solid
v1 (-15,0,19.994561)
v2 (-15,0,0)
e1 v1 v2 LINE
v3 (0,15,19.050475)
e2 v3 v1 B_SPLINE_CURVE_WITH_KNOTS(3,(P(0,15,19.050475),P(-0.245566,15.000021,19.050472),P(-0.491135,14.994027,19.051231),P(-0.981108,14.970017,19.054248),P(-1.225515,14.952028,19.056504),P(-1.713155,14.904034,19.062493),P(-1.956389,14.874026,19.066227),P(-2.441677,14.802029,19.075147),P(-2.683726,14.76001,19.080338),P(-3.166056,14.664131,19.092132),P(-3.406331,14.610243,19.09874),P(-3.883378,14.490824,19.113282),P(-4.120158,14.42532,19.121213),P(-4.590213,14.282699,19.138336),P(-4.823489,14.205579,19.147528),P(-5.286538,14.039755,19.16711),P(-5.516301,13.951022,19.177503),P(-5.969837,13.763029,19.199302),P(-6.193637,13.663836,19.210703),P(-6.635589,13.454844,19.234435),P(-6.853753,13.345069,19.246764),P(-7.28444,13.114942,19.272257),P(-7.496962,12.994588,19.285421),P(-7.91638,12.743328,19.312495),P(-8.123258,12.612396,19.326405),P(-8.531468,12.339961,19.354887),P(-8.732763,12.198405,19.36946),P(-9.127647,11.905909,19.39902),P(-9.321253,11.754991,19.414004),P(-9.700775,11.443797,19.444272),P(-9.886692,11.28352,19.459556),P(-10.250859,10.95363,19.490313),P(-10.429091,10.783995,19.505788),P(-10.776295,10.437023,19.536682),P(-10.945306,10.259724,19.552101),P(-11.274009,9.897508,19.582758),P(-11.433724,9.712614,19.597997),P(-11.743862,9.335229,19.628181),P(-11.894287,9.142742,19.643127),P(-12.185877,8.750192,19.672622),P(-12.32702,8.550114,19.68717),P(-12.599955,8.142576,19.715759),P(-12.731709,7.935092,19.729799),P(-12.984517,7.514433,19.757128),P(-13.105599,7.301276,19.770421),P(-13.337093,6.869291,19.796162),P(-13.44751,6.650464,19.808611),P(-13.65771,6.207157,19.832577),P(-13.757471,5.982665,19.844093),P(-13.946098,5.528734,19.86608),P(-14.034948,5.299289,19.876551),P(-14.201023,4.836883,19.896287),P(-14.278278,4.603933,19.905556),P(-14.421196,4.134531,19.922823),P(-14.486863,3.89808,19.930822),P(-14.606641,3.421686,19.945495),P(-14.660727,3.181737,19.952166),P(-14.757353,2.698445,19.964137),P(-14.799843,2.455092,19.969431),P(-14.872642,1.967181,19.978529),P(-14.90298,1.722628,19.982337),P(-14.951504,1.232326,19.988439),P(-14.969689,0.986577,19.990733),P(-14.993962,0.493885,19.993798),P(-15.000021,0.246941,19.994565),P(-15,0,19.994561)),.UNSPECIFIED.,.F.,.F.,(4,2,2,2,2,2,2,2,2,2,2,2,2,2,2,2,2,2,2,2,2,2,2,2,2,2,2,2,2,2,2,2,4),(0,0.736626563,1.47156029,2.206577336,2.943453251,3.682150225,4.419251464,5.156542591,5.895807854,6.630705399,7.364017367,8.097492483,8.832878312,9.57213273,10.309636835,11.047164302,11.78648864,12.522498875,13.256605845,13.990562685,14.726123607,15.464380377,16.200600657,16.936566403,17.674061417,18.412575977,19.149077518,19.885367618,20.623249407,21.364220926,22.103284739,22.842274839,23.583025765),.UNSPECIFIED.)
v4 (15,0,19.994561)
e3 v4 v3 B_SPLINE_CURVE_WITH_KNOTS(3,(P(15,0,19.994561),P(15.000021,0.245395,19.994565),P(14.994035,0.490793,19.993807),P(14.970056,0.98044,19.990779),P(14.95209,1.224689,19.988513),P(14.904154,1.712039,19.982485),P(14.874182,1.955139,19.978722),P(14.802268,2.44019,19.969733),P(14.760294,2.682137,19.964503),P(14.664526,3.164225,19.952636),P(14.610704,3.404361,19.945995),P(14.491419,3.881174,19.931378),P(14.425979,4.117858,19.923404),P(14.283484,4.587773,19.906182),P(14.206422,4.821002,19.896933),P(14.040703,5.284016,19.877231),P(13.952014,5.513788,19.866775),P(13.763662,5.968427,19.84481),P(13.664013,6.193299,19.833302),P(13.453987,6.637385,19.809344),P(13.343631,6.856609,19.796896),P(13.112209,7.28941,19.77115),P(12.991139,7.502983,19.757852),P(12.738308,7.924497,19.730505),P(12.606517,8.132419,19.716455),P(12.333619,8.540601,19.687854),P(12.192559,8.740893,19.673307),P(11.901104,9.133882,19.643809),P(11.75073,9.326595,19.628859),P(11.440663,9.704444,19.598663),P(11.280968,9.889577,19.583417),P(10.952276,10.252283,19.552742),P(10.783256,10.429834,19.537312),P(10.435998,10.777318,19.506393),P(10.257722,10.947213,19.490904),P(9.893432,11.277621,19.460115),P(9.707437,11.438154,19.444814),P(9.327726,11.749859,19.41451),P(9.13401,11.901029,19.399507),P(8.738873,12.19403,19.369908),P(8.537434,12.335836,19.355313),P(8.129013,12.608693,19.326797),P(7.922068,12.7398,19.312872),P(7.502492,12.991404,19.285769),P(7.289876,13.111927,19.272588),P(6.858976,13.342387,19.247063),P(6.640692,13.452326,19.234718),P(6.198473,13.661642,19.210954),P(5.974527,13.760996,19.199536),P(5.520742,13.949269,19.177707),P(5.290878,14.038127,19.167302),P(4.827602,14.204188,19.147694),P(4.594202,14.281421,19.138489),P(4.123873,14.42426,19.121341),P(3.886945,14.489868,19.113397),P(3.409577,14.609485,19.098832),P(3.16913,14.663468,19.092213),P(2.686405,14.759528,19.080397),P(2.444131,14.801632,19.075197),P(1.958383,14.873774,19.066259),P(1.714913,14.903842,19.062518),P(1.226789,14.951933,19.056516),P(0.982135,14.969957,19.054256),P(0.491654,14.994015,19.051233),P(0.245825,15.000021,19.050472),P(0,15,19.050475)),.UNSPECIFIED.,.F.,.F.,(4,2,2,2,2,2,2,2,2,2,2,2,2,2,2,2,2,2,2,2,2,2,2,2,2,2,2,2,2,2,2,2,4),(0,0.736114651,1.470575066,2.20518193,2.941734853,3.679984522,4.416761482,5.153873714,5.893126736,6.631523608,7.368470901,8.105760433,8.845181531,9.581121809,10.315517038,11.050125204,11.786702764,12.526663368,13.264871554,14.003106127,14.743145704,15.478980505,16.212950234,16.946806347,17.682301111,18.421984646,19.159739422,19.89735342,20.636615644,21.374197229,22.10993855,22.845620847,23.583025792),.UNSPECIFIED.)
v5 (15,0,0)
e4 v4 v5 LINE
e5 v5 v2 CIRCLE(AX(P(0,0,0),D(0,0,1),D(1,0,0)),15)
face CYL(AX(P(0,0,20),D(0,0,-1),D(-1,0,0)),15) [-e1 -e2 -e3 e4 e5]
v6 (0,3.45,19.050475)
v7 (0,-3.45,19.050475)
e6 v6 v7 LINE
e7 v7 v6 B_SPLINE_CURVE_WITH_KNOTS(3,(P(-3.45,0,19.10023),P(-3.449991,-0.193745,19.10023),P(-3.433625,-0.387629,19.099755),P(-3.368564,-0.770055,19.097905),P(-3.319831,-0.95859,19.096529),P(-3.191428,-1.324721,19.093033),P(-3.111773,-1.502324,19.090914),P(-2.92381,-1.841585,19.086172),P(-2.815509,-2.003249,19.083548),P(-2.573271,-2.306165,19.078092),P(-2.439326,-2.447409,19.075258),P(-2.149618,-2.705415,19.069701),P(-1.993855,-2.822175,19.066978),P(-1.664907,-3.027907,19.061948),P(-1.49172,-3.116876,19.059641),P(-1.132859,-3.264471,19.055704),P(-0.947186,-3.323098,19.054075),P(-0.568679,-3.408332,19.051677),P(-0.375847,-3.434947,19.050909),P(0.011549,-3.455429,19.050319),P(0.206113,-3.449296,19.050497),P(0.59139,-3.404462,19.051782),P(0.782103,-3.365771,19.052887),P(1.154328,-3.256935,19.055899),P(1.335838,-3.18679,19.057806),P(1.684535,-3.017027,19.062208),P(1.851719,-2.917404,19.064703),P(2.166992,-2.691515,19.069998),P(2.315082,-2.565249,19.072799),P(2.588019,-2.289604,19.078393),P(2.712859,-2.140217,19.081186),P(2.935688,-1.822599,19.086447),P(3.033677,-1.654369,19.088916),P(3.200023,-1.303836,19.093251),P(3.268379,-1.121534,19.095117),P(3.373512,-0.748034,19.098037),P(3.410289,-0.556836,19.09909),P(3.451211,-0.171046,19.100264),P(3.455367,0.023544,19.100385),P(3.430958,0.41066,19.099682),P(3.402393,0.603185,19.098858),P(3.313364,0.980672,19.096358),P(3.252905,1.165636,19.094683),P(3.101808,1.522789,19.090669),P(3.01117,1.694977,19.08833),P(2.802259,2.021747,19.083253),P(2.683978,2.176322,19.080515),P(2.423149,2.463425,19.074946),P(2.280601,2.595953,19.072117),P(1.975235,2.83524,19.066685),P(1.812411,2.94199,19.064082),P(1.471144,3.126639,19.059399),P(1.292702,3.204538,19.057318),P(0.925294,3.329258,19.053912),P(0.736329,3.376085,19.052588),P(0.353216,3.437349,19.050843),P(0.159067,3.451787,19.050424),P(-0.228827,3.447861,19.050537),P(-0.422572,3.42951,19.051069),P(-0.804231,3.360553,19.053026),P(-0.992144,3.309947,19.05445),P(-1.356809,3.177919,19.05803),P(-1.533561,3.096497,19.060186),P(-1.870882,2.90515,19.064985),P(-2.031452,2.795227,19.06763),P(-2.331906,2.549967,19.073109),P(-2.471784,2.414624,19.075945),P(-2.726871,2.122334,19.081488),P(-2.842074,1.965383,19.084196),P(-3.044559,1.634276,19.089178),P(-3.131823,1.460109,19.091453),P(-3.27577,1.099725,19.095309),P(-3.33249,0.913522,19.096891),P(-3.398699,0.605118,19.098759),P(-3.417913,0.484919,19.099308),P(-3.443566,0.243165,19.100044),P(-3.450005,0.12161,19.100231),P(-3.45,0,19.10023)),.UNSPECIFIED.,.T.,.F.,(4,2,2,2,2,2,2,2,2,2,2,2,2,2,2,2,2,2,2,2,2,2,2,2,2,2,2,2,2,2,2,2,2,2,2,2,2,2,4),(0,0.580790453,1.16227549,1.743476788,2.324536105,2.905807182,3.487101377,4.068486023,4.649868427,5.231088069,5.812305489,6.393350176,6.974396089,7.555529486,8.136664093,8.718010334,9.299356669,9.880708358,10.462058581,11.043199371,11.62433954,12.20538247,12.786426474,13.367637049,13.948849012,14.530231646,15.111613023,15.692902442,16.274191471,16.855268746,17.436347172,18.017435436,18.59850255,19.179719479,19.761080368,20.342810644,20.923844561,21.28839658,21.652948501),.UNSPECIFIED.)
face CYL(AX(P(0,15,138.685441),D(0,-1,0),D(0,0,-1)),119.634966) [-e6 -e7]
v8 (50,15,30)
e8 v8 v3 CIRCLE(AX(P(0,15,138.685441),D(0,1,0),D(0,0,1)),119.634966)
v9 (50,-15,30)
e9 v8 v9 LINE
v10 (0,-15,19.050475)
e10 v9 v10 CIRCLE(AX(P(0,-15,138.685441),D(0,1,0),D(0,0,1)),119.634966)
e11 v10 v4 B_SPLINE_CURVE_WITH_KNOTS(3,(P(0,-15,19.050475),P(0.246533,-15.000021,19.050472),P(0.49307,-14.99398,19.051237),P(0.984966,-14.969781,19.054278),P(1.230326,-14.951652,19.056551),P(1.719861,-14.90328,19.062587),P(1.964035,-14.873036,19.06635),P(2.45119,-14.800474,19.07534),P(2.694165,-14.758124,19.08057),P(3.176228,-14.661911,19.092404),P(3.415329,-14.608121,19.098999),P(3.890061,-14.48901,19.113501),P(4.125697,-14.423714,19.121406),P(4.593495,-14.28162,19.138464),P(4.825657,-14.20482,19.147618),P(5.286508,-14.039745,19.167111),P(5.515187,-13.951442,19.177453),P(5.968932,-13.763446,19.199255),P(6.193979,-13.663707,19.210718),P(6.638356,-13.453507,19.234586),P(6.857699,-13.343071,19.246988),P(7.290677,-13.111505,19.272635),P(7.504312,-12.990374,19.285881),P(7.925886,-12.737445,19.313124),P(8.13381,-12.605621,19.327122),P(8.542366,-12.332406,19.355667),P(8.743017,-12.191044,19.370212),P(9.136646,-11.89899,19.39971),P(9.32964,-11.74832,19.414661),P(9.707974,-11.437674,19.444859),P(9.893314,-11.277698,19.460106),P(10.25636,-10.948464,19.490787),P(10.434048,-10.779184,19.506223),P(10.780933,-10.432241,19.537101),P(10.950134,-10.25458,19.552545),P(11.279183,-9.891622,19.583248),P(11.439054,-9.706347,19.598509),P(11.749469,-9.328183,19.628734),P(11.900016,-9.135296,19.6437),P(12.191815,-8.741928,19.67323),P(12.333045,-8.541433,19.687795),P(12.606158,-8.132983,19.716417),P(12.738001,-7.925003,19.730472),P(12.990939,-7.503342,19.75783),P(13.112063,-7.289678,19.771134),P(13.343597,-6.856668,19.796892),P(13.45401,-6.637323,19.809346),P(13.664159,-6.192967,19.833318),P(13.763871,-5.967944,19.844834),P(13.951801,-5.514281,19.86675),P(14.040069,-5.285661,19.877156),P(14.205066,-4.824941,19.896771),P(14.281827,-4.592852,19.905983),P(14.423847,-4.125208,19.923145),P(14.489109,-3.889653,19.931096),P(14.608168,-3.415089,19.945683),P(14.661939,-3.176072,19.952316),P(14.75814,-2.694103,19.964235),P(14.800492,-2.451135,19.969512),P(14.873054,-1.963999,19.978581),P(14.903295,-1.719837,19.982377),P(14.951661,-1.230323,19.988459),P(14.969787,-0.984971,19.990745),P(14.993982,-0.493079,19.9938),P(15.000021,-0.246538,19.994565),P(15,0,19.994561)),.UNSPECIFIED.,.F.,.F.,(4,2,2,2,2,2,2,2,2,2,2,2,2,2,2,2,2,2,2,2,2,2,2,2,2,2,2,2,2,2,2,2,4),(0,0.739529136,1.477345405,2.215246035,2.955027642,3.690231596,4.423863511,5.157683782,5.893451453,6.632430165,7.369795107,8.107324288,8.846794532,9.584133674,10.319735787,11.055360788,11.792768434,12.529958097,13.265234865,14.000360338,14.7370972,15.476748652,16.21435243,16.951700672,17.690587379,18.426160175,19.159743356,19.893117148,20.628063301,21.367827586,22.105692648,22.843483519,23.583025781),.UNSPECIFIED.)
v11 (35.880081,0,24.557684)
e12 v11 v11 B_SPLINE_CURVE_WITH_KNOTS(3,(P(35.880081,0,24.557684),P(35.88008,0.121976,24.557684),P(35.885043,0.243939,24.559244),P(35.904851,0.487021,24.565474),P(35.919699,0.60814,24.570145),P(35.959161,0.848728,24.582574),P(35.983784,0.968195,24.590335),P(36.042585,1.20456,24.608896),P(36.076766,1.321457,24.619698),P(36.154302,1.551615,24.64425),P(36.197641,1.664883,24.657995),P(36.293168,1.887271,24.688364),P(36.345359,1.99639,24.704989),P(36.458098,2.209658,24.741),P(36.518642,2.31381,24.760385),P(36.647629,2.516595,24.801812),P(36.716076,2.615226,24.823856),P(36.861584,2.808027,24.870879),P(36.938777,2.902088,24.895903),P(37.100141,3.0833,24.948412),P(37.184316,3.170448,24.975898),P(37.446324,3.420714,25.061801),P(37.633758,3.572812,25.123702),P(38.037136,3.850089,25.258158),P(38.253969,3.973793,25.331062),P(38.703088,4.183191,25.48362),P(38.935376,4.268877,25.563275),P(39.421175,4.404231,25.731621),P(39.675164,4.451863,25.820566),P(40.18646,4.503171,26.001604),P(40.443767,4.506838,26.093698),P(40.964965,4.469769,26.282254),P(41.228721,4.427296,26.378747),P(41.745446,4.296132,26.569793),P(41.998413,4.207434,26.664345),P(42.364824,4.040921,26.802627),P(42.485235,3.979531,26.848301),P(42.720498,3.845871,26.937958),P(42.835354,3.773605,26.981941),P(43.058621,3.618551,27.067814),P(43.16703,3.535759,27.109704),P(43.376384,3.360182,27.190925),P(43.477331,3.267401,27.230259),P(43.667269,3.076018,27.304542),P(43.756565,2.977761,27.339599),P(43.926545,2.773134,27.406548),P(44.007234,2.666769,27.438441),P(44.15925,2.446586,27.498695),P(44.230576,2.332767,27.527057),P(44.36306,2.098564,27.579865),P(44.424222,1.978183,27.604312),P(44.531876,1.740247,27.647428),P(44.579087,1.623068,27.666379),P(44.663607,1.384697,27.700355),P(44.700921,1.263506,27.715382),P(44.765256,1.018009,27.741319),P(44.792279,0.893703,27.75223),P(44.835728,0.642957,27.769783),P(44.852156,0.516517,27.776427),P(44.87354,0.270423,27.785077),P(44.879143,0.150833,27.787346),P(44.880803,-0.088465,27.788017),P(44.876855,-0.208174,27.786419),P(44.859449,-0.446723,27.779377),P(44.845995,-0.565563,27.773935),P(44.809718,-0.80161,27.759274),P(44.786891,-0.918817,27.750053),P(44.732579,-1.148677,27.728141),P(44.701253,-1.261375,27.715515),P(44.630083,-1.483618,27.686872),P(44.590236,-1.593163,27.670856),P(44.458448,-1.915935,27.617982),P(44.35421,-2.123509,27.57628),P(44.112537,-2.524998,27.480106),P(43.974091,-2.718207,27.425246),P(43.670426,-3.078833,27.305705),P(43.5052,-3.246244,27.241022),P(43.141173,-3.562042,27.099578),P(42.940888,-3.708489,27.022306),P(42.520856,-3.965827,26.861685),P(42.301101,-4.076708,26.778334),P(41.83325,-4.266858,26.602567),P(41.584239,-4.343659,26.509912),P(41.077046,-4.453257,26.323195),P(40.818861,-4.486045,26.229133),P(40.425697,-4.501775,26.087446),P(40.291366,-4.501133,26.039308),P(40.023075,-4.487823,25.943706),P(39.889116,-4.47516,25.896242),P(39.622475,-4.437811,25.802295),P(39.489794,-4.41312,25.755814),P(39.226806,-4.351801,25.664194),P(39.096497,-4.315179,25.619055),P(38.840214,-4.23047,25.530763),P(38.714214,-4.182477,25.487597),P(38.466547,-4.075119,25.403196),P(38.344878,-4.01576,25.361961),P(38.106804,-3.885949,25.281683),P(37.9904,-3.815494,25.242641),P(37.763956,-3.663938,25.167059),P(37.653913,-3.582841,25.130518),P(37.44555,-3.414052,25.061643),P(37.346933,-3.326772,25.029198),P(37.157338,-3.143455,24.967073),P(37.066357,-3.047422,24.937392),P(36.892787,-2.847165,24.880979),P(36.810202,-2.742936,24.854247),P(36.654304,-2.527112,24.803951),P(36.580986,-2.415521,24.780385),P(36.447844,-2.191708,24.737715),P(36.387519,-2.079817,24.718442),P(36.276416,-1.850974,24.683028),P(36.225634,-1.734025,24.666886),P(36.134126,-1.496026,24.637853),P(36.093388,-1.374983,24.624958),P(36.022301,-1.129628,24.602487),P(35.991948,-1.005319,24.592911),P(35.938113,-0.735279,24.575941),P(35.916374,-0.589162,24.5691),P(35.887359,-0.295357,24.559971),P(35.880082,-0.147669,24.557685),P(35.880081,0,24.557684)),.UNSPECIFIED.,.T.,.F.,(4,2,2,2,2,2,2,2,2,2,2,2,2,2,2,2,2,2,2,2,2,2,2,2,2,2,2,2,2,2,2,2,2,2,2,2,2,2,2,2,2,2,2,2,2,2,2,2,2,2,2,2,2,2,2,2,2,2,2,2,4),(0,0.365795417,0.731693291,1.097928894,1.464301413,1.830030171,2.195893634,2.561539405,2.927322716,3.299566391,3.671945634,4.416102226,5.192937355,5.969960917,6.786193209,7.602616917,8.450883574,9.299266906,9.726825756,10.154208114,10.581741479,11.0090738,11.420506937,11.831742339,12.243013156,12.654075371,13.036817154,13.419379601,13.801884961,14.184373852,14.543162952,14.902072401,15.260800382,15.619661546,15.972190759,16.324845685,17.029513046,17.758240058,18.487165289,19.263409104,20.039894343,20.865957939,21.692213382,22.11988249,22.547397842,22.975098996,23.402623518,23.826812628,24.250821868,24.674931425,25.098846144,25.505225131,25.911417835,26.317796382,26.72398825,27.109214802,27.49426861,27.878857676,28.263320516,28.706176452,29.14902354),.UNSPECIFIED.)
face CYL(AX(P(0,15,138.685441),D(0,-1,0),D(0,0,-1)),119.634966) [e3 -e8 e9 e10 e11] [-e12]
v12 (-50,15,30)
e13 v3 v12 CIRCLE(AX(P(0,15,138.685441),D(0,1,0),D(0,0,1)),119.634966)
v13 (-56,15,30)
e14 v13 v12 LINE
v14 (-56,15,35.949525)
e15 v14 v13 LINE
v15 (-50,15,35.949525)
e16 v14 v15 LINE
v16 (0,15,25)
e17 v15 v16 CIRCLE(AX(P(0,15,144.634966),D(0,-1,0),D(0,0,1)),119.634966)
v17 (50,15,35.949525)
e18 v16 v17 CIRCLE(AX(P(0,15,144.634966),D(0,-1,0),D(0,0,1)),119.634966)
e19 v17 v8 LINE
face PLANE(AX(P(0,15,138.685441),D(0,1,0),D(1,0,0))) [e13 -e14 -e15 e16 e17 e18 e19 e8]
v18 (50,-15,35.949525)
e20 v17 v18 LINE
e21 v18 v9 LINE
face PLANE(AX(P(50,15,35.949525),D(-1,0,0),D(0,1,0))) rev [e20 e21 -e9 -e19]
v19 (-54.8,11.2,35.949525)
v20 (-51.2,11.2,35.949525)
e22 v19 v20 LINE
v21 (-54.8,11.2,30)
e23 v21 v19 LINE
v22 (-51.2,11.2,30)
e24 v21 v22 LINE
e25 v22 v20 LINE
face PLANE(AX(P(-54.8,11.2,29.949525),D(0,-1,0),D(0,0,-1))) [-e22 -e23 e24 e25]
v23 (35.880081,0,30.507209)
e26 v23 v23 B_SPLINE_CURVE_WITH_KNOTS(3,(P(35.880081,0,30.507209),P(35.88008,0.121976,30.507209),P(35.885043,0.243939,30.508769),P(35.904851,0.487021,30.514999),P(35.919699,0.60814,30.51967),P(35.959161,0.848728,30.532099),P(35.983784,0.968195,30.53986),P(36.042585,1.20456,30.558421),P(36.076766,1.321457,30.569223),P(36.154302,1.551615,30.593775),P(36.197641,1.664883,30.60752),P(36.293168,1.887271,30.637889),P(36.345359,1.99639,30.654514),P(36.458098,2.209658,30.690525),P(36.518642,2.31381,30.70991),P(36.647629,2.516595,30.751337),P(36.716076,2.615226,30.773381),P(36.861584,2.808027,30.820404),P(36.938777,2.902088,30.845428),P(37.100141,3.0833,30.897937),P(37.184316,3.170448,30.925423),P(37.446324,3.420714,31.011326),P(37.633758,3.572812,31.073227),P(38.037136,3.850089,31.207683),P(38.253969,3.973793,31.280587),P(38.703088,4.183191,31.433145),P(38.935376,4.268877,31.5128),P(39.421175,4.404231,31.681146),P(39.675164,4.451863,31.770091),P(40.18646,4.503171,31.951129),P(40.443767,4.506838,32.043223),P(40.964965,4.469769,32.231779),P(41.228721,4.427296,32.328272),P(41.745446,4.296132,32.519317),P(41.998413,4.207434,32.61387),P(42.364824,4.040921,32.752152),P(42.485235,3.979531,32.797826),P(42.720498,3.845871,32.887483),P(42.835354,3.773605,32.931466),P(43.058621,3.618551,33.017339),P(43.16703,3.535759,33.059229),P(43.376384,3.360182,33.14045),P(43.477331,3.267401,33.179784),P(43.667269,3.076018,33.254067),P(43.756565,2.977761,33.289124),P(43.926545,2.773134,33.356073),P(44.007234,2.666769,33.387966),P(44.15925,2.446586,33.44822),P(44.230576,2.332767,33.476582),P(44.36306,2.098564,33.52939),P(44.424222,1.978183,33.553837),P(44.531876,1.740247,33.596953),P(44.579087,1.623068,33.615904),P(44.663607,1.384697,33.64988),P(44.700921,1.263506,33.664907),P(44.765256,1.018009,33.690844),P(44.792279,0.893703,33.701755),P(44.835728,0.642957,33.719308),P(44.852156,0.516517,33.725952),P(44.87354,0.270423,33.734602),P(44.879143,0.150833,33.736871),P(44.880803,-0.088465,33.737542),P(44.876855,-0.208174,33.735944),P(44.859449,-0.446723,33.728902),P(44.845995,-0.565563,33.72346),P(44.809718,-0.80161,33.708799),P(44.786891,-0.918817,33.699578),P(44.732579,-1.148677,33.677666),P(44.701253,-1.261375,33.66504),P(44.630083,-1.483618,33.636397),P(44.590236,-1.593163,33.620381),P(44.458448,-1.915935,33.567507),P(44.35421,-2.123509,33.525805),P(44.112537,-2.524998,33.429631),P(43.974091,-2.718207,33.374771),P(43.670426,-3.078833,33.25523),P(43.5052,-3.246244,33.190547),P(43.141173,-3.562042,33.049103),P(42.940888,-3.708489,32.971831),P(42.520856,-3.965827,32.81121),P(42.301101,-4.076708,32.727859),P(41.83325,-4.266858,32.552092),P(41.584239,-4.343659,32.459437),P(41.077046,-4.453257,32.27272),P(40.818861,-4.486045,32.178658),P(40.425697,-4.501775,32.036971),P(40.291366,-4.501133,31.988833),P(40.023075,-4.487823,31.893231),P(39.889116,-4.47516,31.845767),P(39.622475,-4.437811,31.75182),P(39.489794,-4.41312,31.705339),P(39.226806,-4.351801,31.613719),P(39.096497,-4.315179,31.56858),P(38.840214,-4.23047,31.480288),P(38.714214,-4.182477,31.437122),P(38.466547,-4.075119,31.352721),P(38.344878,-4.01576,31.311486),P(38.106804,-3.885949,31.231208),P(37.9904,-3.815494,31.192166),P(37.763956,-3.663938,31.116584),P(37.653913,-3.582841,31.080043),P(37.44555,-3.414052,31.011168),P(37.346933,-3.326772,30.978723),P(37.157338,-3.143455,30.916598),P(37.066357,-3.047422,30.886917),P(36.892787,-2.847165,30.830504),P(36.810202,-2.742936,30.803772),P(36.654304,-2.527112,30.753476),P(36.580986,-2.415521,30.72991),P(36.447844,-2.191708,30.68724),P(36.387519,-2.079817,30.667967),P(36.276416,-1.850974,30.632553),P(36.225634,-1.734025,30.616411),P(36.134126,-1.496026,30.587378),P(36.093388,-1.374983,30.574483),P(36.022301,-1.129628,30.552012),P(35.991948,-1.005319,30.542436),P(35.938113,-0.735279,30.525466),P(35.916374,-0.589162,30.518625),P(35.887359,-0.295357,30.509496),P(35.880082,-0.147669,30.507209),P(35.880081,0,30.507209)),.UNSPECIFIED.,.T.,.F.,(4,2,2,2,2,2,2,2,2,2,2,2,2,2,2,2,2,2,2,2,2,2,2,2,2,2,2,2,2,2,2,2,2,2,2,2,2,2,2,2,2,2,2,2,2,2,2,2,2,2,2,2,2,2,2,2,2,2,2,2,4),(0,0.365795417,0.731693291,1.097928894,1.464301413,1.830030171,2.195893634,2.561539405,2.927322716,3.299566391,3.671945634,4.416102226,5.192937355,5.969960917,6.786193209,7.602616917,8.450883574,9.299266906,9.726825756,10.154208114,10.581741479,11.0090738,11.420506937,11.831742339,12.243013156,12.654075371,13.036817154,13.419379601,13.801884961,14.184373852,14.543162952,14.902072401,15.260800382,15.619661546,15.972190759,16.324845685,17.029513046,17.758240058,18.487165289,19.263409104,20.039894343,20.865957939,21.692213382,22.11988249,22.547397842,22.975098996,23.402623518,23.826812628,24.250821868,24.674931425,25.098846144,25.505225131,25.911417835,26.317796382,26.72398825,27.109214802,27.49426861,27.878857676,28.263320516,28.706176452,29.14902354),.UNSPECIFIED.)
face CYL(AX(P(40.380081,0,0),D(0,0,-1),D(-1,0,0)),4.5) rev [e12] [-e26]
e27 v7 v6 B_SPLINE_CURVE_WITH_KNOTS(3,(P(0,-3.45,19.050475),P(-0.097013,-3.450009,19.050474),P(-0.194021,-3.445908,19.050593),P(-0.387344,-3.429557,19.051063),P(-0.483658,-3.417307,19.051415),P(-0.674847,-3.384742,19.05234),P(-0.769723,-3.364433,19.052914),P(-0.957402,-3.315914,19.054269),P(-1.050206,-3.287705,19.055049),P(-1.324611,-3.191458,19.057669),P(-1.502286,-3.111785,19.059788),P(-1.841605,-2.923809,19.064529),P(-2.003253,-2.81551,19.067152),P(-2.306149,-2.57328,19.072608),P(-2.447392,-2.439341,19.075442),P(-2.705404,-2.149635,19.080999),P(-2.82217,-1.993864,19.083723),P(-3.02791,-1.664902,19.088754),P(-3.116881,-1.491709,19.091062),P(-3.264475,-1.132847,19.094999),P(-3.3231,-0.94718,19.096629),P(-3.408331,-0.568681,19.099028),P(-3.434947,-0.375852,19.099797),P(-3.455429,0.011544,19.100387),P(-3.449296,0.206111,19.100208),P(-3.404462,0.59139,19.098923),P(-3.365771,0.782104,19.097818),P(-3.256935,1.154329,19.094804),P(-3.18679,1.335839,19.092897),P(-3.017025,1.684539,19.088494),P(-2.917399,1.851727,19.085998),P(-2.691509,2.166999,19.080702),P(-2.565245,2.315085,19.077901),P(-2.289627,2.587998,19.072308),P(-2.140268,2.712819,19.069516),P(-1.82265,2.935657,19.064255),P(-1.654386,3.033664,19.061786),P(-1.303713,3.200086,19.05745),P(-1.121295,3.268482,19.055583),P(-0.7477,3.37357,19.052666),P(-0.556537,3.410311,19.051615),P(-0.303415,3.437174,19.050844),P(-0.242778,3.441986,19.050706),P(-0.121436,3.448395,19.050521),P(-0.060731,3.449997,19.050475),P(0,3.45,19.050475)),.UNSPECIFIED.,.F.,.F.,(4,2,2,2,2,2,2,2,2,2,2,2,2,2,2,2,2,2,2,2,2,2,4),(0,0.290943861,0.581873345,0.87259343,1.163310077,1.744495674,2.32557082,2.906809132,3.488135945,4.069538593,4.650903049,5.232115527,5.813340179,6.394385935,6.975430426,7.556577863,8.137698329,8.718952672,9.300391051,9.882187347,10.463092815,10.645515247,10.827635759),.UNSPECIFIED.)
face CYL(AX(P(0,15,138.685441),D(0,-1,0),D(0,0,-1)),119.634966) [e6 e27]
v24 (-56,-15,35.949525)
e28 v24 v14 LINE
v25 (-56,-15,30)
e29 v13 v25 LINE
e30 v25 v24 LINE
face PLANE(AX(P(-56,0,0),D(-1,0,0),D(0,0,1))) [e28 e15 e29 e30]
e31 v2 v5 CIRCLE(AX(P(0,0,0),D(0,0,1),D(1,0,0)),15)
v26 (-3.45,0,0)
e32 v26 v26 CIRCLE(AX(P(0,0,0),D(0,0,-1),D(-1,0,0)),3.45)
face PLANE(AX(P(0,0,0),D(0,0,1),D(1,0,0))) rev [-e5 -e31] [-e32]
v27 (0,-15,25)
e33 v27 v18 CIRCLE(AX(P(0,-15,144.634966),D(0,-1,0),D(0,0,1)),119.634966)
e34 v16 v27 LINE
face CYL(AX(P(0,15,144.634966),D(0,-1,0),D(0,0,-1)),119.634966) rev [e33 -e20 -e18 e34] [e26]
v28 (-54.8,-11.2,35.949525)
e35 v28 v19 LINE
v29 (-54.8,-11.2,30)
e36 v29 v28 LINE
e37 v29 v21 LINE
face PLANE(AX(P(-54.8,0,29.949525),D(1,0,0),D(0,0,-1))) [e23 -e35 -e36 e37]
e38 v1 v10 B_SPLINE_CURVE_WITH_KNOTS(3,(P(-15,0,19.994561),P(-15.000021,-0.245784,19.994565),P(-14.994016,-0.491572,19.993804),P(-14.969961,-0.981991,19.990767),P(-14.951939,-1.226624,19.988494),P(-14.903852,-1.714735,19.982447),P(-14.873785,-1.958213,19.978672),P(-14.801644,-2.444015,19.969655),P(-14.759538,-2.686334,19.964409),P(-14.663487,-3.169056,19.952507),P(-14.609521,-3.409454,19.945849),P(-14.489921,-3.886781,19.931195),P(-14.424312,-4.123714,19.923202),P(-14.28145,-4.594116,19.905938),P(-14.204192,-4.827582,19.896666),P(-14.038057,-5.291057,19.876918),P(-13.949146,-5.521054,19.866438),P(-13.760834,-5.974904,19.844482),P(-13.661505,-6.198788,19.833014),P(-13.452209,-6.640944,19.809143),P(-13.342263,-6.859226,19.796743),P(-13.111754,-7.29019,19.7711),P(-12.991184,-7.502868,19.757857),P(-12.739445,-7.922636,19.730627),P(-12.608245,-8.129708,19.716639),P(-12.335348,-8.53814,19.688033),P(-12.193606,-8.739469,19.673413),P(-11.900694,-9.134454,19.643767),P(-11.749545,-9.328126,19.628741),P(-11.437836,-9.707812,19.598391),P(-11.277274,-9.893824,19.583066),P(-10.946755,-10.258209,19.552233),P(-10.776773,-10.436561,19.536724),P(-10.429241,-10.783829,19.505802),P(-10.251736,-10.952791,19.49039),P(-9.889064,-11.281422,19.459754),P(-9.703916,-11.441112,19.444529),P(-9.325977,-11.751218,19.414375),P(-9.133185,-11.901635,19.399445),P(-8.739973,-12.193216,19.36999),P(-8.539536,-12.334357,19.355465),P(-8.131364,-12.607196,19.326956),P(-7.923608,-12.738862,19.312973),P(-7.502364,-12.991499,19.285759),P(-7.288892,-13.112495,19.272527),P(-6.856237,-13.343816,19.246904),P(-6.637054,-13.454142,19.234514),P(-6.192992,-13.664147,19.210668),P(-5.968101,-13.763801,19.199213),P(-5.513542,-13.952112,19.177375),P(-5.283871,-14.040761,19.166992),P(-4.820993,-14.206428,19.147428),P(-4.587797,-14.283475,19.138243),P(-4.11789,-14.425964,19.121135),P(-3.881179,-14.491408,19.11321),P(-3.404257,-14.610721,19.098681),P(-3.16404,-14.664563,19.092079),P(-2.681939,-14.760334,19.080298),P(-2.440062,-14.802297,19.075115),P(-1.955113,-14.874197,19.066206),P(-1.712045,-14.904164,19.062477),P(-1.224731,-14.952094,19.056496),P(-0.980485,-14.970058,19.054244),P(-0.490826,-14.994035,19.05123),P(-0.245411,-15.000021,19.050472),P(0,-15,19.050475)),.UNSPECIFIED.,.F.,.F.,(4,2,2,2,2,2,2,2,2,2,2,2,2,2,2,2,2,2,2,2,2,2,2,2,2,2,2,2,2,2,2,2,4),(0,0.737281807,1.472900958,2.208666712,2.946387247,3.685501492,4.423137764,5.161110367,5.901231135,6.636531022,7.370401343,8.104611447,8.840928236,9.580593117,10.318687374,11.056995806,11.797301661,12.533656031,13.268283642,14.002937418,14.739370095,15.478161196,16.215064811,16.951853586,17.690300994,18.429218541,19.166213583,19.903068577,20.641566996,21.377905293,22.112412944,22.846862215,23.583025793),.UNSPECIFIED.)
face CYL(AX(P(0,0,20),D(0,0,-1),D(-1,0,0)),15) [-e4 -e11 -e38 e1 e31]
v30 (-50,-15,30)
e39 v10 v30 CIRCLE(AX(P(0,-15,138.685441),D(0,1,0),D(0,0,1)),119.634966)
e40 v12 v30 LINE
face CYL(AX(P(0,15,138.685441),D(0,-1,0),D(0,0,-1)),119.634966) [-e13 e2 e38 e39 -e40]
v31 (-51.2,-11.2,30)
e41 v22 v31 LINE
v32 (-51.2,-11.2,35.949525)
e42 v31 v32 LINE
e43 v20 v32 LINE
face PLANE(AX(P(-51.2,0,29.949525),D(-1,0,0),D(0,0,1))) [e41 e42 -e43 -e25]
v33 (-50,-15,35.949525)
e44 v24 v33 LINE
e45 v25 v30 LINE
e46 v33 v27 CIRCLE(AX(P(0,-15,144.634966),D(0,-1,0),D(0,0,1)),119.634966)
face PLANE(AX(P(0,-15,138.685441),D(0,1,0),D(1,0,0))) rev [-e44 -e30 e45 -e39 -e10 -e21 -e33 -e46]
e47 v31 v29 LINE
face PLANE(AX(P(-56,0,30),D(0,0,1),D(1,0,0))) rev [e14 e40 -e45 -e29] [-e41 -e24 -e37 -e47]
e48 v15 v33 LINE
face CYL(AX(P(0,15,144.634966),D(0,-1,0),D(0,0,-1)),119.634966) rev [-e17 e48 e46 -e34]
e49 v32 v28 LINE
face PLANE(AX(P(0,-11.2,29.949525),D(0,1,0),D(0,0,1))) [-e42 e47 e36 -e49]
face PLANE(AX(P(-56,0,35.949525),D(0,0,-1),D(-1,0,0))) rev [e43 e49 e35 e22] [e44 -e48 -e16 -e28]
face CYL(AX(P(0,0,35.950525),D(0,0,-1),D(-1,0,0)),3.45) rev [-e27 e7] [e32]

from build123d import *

# Parameters (mm, degrees)
BOSS_EXTRUDE1_START         = -15
BOSS_EXTRUDE1_DEPTH         = 30
BOSS_EXTRUDE1_START_2       = -12.7
BOSS_EXTRUDE1_2_OUTLINE_W   = 6
BOSS_EXTRUDE1_2_OUTLINE_H   = 5.949524979
BOSS_EXTRUDE1_2_DEPTH       = 25.4
BOSS_EXTRUDE1_3_OUTLINE_R   = 15
BOSS_EXTRUDE1_3_OUTLINE_R_2 = 4.55
BOSS_EXTRUDE1_3_DEPTH       = 19.994560744
SKETCH4_W                   = 3.6
SKETCH4_H                   = 22.4
CUT_EXTRUDE1_DEPTH          = 6
BOSS_EXTRUDE2_REACH         = 70.216
BOSS_EXTRUDE2_END_RADIUS    = 119.634966004
SKETCH9_R                   = 6.57997386
SKETCH9_R_2                 = 3.45
SKETCH10_W                  = 5.949524979
SKETCH10_H                  = 2.3
BOSS_EXTRUDE3_DEPTH         = 6


with BuildPart() as part:
    # Boss-Extrude1: read off the stored shape, not the designer's step
    # Boss-Extrude1 outline → Boss-Extrude1 (new body)
    with BuildSketch(Plane(origin=(0, 0, 0), x_dir=(1, 0, 0), z_dir=(0, 1, 0)).offset(BOSS_EXTRUDE1_START)):
        with BuildLine():
            Line((-50, -30), (-50, -35.949524979))
            ThreePointArc((-50, -35.949524979), (-25.592440765, -27.769436157), (0, -25))
            ThreePointArc((0, -25), (25.592440765, -27.769436157), (50, -35.949524979))
            Line((50, -35.949524979), (50, -30))
            ThreePointArc((50, -30), (27.810549479, -22.327809439), (4.550000287, -19.13702996))
            ThreePointArc((4.550000287, -19.13702996), (2.275411741, -19.072115713), (0, -19.050475021))
            ThreePointArc((0, -19.050475021), (-25.592440765, -21.819911178), (-50, -30))
        make_face()
    extrude(amount=BOSS_EXTRUDE1_DEPTH)

    # Boss-Extrude1 2 outline → Boss-Extrude1 2 (add)
    with BuildSketch(Plane(origin=(0, 0, 0), x_dir=(1, 0, 0), z_dir=(0, 1, 0)).offset(BOSS_EXTRUDE1_START_2)):
        with Locations((-53, -32.97476249)):
            Rectangle(BOSS_EXTRUDE1_2_OUTLINE_W, BOSS_EXTRUDE1_2_OUTLINE_H)
    extrude(amount=BOSS_EXTRUDE1_2_DEPTH)

    # Boss-Extrude1 3 outline → Boss-Extrude1 3 (add)
    with BuildSketch(Plane.XY):
        Circle(BOSS_EXTRUDE1_3_OUTLINE_R)
        Circle(BOSS_EXTRUDE1_3_OUTLINE_R_2, mode=Mode.SUBTRACT)
    extrude(amount=BOSS_EXTRUDE1_3_DEPTH)

    # Sketch4 → Cut-Extrude1 (cut)
    with BuildSketch(Plane.XY.offset(35.949524979)):
        with Locations((-53, 0)):
            Rectangle(SKETCH4_W, SKETCH4_H)
    extrude(amount=-CUT_EXTRUDE1_DEPTH, mode=Mode.SUBTRACT)

    # Sketch8 → CBORE for M8 Hex Head Bolt1 (revolve, cut)
    with BuildSketch(Plane.YZ.offset(40.380081118)):
        Polygon((0, 0), (0, 35.949524979), (4.5, 35.949524979), (4.5, 5.68), (9.005, 5.68), (9.005, 0.025), (9.03, 0), align=None)
    revolve(axis=Axis((40.380081118, 0, -6.35), (0, 0, 1)), mode=Mode.SUBTRACT)

    # Boss-Extrude2: up to this cylinder (the profile starts outside it)
    boss_extrude2_end = Plane(origin=(0, 0, 138.685441025), z_dir=(0, -1, 0)) * Cylinder(BOSS_EXTRUDE2_END_RADIUS, 380.701932008, mode=Mode.PRIVATE)
    # Sketch9 → Boss-Extrude2 (add, up to the surface)
    with BuildSketch(Plane(origin=(0, 0, 0), x_dir=(-1, 0, 0), z_dir=(0, 0, -1)), mode=Mode.PRIVATE) as boss_extrude2_sk1:
        Circle(SKETCH9_R)
        Circle(SKETCH9_R_2, mode=Mode.SUBTRACT)
    boss_extrude2_tool1 = extrude(boss_extrude2_sk1.sketch, amount=-BOSS_EXTRUDE2_REACH, mode=Mode.PRIVATE) - boss_extrude2_end
    add(boss_extrude2_tool1.solids().sort_by_distance((6.393864, 0, 0))[0])

    # Sketch10 → Boss-Extrude3 (add)
    with BuildSketch(Plane.ZY.offset(50)):
        with Locations((32.97476249, 13.85)):
            Rectangle(SKETCH10_W, SKETCH10_H)
        with Locations((32.97476249, -13.85)):
            Rectangle(SKETCH10_W, SKETCH10_H)
    extrude(amount=BOSS_EXTRUDE3_DEPTH)


solid = part.part
